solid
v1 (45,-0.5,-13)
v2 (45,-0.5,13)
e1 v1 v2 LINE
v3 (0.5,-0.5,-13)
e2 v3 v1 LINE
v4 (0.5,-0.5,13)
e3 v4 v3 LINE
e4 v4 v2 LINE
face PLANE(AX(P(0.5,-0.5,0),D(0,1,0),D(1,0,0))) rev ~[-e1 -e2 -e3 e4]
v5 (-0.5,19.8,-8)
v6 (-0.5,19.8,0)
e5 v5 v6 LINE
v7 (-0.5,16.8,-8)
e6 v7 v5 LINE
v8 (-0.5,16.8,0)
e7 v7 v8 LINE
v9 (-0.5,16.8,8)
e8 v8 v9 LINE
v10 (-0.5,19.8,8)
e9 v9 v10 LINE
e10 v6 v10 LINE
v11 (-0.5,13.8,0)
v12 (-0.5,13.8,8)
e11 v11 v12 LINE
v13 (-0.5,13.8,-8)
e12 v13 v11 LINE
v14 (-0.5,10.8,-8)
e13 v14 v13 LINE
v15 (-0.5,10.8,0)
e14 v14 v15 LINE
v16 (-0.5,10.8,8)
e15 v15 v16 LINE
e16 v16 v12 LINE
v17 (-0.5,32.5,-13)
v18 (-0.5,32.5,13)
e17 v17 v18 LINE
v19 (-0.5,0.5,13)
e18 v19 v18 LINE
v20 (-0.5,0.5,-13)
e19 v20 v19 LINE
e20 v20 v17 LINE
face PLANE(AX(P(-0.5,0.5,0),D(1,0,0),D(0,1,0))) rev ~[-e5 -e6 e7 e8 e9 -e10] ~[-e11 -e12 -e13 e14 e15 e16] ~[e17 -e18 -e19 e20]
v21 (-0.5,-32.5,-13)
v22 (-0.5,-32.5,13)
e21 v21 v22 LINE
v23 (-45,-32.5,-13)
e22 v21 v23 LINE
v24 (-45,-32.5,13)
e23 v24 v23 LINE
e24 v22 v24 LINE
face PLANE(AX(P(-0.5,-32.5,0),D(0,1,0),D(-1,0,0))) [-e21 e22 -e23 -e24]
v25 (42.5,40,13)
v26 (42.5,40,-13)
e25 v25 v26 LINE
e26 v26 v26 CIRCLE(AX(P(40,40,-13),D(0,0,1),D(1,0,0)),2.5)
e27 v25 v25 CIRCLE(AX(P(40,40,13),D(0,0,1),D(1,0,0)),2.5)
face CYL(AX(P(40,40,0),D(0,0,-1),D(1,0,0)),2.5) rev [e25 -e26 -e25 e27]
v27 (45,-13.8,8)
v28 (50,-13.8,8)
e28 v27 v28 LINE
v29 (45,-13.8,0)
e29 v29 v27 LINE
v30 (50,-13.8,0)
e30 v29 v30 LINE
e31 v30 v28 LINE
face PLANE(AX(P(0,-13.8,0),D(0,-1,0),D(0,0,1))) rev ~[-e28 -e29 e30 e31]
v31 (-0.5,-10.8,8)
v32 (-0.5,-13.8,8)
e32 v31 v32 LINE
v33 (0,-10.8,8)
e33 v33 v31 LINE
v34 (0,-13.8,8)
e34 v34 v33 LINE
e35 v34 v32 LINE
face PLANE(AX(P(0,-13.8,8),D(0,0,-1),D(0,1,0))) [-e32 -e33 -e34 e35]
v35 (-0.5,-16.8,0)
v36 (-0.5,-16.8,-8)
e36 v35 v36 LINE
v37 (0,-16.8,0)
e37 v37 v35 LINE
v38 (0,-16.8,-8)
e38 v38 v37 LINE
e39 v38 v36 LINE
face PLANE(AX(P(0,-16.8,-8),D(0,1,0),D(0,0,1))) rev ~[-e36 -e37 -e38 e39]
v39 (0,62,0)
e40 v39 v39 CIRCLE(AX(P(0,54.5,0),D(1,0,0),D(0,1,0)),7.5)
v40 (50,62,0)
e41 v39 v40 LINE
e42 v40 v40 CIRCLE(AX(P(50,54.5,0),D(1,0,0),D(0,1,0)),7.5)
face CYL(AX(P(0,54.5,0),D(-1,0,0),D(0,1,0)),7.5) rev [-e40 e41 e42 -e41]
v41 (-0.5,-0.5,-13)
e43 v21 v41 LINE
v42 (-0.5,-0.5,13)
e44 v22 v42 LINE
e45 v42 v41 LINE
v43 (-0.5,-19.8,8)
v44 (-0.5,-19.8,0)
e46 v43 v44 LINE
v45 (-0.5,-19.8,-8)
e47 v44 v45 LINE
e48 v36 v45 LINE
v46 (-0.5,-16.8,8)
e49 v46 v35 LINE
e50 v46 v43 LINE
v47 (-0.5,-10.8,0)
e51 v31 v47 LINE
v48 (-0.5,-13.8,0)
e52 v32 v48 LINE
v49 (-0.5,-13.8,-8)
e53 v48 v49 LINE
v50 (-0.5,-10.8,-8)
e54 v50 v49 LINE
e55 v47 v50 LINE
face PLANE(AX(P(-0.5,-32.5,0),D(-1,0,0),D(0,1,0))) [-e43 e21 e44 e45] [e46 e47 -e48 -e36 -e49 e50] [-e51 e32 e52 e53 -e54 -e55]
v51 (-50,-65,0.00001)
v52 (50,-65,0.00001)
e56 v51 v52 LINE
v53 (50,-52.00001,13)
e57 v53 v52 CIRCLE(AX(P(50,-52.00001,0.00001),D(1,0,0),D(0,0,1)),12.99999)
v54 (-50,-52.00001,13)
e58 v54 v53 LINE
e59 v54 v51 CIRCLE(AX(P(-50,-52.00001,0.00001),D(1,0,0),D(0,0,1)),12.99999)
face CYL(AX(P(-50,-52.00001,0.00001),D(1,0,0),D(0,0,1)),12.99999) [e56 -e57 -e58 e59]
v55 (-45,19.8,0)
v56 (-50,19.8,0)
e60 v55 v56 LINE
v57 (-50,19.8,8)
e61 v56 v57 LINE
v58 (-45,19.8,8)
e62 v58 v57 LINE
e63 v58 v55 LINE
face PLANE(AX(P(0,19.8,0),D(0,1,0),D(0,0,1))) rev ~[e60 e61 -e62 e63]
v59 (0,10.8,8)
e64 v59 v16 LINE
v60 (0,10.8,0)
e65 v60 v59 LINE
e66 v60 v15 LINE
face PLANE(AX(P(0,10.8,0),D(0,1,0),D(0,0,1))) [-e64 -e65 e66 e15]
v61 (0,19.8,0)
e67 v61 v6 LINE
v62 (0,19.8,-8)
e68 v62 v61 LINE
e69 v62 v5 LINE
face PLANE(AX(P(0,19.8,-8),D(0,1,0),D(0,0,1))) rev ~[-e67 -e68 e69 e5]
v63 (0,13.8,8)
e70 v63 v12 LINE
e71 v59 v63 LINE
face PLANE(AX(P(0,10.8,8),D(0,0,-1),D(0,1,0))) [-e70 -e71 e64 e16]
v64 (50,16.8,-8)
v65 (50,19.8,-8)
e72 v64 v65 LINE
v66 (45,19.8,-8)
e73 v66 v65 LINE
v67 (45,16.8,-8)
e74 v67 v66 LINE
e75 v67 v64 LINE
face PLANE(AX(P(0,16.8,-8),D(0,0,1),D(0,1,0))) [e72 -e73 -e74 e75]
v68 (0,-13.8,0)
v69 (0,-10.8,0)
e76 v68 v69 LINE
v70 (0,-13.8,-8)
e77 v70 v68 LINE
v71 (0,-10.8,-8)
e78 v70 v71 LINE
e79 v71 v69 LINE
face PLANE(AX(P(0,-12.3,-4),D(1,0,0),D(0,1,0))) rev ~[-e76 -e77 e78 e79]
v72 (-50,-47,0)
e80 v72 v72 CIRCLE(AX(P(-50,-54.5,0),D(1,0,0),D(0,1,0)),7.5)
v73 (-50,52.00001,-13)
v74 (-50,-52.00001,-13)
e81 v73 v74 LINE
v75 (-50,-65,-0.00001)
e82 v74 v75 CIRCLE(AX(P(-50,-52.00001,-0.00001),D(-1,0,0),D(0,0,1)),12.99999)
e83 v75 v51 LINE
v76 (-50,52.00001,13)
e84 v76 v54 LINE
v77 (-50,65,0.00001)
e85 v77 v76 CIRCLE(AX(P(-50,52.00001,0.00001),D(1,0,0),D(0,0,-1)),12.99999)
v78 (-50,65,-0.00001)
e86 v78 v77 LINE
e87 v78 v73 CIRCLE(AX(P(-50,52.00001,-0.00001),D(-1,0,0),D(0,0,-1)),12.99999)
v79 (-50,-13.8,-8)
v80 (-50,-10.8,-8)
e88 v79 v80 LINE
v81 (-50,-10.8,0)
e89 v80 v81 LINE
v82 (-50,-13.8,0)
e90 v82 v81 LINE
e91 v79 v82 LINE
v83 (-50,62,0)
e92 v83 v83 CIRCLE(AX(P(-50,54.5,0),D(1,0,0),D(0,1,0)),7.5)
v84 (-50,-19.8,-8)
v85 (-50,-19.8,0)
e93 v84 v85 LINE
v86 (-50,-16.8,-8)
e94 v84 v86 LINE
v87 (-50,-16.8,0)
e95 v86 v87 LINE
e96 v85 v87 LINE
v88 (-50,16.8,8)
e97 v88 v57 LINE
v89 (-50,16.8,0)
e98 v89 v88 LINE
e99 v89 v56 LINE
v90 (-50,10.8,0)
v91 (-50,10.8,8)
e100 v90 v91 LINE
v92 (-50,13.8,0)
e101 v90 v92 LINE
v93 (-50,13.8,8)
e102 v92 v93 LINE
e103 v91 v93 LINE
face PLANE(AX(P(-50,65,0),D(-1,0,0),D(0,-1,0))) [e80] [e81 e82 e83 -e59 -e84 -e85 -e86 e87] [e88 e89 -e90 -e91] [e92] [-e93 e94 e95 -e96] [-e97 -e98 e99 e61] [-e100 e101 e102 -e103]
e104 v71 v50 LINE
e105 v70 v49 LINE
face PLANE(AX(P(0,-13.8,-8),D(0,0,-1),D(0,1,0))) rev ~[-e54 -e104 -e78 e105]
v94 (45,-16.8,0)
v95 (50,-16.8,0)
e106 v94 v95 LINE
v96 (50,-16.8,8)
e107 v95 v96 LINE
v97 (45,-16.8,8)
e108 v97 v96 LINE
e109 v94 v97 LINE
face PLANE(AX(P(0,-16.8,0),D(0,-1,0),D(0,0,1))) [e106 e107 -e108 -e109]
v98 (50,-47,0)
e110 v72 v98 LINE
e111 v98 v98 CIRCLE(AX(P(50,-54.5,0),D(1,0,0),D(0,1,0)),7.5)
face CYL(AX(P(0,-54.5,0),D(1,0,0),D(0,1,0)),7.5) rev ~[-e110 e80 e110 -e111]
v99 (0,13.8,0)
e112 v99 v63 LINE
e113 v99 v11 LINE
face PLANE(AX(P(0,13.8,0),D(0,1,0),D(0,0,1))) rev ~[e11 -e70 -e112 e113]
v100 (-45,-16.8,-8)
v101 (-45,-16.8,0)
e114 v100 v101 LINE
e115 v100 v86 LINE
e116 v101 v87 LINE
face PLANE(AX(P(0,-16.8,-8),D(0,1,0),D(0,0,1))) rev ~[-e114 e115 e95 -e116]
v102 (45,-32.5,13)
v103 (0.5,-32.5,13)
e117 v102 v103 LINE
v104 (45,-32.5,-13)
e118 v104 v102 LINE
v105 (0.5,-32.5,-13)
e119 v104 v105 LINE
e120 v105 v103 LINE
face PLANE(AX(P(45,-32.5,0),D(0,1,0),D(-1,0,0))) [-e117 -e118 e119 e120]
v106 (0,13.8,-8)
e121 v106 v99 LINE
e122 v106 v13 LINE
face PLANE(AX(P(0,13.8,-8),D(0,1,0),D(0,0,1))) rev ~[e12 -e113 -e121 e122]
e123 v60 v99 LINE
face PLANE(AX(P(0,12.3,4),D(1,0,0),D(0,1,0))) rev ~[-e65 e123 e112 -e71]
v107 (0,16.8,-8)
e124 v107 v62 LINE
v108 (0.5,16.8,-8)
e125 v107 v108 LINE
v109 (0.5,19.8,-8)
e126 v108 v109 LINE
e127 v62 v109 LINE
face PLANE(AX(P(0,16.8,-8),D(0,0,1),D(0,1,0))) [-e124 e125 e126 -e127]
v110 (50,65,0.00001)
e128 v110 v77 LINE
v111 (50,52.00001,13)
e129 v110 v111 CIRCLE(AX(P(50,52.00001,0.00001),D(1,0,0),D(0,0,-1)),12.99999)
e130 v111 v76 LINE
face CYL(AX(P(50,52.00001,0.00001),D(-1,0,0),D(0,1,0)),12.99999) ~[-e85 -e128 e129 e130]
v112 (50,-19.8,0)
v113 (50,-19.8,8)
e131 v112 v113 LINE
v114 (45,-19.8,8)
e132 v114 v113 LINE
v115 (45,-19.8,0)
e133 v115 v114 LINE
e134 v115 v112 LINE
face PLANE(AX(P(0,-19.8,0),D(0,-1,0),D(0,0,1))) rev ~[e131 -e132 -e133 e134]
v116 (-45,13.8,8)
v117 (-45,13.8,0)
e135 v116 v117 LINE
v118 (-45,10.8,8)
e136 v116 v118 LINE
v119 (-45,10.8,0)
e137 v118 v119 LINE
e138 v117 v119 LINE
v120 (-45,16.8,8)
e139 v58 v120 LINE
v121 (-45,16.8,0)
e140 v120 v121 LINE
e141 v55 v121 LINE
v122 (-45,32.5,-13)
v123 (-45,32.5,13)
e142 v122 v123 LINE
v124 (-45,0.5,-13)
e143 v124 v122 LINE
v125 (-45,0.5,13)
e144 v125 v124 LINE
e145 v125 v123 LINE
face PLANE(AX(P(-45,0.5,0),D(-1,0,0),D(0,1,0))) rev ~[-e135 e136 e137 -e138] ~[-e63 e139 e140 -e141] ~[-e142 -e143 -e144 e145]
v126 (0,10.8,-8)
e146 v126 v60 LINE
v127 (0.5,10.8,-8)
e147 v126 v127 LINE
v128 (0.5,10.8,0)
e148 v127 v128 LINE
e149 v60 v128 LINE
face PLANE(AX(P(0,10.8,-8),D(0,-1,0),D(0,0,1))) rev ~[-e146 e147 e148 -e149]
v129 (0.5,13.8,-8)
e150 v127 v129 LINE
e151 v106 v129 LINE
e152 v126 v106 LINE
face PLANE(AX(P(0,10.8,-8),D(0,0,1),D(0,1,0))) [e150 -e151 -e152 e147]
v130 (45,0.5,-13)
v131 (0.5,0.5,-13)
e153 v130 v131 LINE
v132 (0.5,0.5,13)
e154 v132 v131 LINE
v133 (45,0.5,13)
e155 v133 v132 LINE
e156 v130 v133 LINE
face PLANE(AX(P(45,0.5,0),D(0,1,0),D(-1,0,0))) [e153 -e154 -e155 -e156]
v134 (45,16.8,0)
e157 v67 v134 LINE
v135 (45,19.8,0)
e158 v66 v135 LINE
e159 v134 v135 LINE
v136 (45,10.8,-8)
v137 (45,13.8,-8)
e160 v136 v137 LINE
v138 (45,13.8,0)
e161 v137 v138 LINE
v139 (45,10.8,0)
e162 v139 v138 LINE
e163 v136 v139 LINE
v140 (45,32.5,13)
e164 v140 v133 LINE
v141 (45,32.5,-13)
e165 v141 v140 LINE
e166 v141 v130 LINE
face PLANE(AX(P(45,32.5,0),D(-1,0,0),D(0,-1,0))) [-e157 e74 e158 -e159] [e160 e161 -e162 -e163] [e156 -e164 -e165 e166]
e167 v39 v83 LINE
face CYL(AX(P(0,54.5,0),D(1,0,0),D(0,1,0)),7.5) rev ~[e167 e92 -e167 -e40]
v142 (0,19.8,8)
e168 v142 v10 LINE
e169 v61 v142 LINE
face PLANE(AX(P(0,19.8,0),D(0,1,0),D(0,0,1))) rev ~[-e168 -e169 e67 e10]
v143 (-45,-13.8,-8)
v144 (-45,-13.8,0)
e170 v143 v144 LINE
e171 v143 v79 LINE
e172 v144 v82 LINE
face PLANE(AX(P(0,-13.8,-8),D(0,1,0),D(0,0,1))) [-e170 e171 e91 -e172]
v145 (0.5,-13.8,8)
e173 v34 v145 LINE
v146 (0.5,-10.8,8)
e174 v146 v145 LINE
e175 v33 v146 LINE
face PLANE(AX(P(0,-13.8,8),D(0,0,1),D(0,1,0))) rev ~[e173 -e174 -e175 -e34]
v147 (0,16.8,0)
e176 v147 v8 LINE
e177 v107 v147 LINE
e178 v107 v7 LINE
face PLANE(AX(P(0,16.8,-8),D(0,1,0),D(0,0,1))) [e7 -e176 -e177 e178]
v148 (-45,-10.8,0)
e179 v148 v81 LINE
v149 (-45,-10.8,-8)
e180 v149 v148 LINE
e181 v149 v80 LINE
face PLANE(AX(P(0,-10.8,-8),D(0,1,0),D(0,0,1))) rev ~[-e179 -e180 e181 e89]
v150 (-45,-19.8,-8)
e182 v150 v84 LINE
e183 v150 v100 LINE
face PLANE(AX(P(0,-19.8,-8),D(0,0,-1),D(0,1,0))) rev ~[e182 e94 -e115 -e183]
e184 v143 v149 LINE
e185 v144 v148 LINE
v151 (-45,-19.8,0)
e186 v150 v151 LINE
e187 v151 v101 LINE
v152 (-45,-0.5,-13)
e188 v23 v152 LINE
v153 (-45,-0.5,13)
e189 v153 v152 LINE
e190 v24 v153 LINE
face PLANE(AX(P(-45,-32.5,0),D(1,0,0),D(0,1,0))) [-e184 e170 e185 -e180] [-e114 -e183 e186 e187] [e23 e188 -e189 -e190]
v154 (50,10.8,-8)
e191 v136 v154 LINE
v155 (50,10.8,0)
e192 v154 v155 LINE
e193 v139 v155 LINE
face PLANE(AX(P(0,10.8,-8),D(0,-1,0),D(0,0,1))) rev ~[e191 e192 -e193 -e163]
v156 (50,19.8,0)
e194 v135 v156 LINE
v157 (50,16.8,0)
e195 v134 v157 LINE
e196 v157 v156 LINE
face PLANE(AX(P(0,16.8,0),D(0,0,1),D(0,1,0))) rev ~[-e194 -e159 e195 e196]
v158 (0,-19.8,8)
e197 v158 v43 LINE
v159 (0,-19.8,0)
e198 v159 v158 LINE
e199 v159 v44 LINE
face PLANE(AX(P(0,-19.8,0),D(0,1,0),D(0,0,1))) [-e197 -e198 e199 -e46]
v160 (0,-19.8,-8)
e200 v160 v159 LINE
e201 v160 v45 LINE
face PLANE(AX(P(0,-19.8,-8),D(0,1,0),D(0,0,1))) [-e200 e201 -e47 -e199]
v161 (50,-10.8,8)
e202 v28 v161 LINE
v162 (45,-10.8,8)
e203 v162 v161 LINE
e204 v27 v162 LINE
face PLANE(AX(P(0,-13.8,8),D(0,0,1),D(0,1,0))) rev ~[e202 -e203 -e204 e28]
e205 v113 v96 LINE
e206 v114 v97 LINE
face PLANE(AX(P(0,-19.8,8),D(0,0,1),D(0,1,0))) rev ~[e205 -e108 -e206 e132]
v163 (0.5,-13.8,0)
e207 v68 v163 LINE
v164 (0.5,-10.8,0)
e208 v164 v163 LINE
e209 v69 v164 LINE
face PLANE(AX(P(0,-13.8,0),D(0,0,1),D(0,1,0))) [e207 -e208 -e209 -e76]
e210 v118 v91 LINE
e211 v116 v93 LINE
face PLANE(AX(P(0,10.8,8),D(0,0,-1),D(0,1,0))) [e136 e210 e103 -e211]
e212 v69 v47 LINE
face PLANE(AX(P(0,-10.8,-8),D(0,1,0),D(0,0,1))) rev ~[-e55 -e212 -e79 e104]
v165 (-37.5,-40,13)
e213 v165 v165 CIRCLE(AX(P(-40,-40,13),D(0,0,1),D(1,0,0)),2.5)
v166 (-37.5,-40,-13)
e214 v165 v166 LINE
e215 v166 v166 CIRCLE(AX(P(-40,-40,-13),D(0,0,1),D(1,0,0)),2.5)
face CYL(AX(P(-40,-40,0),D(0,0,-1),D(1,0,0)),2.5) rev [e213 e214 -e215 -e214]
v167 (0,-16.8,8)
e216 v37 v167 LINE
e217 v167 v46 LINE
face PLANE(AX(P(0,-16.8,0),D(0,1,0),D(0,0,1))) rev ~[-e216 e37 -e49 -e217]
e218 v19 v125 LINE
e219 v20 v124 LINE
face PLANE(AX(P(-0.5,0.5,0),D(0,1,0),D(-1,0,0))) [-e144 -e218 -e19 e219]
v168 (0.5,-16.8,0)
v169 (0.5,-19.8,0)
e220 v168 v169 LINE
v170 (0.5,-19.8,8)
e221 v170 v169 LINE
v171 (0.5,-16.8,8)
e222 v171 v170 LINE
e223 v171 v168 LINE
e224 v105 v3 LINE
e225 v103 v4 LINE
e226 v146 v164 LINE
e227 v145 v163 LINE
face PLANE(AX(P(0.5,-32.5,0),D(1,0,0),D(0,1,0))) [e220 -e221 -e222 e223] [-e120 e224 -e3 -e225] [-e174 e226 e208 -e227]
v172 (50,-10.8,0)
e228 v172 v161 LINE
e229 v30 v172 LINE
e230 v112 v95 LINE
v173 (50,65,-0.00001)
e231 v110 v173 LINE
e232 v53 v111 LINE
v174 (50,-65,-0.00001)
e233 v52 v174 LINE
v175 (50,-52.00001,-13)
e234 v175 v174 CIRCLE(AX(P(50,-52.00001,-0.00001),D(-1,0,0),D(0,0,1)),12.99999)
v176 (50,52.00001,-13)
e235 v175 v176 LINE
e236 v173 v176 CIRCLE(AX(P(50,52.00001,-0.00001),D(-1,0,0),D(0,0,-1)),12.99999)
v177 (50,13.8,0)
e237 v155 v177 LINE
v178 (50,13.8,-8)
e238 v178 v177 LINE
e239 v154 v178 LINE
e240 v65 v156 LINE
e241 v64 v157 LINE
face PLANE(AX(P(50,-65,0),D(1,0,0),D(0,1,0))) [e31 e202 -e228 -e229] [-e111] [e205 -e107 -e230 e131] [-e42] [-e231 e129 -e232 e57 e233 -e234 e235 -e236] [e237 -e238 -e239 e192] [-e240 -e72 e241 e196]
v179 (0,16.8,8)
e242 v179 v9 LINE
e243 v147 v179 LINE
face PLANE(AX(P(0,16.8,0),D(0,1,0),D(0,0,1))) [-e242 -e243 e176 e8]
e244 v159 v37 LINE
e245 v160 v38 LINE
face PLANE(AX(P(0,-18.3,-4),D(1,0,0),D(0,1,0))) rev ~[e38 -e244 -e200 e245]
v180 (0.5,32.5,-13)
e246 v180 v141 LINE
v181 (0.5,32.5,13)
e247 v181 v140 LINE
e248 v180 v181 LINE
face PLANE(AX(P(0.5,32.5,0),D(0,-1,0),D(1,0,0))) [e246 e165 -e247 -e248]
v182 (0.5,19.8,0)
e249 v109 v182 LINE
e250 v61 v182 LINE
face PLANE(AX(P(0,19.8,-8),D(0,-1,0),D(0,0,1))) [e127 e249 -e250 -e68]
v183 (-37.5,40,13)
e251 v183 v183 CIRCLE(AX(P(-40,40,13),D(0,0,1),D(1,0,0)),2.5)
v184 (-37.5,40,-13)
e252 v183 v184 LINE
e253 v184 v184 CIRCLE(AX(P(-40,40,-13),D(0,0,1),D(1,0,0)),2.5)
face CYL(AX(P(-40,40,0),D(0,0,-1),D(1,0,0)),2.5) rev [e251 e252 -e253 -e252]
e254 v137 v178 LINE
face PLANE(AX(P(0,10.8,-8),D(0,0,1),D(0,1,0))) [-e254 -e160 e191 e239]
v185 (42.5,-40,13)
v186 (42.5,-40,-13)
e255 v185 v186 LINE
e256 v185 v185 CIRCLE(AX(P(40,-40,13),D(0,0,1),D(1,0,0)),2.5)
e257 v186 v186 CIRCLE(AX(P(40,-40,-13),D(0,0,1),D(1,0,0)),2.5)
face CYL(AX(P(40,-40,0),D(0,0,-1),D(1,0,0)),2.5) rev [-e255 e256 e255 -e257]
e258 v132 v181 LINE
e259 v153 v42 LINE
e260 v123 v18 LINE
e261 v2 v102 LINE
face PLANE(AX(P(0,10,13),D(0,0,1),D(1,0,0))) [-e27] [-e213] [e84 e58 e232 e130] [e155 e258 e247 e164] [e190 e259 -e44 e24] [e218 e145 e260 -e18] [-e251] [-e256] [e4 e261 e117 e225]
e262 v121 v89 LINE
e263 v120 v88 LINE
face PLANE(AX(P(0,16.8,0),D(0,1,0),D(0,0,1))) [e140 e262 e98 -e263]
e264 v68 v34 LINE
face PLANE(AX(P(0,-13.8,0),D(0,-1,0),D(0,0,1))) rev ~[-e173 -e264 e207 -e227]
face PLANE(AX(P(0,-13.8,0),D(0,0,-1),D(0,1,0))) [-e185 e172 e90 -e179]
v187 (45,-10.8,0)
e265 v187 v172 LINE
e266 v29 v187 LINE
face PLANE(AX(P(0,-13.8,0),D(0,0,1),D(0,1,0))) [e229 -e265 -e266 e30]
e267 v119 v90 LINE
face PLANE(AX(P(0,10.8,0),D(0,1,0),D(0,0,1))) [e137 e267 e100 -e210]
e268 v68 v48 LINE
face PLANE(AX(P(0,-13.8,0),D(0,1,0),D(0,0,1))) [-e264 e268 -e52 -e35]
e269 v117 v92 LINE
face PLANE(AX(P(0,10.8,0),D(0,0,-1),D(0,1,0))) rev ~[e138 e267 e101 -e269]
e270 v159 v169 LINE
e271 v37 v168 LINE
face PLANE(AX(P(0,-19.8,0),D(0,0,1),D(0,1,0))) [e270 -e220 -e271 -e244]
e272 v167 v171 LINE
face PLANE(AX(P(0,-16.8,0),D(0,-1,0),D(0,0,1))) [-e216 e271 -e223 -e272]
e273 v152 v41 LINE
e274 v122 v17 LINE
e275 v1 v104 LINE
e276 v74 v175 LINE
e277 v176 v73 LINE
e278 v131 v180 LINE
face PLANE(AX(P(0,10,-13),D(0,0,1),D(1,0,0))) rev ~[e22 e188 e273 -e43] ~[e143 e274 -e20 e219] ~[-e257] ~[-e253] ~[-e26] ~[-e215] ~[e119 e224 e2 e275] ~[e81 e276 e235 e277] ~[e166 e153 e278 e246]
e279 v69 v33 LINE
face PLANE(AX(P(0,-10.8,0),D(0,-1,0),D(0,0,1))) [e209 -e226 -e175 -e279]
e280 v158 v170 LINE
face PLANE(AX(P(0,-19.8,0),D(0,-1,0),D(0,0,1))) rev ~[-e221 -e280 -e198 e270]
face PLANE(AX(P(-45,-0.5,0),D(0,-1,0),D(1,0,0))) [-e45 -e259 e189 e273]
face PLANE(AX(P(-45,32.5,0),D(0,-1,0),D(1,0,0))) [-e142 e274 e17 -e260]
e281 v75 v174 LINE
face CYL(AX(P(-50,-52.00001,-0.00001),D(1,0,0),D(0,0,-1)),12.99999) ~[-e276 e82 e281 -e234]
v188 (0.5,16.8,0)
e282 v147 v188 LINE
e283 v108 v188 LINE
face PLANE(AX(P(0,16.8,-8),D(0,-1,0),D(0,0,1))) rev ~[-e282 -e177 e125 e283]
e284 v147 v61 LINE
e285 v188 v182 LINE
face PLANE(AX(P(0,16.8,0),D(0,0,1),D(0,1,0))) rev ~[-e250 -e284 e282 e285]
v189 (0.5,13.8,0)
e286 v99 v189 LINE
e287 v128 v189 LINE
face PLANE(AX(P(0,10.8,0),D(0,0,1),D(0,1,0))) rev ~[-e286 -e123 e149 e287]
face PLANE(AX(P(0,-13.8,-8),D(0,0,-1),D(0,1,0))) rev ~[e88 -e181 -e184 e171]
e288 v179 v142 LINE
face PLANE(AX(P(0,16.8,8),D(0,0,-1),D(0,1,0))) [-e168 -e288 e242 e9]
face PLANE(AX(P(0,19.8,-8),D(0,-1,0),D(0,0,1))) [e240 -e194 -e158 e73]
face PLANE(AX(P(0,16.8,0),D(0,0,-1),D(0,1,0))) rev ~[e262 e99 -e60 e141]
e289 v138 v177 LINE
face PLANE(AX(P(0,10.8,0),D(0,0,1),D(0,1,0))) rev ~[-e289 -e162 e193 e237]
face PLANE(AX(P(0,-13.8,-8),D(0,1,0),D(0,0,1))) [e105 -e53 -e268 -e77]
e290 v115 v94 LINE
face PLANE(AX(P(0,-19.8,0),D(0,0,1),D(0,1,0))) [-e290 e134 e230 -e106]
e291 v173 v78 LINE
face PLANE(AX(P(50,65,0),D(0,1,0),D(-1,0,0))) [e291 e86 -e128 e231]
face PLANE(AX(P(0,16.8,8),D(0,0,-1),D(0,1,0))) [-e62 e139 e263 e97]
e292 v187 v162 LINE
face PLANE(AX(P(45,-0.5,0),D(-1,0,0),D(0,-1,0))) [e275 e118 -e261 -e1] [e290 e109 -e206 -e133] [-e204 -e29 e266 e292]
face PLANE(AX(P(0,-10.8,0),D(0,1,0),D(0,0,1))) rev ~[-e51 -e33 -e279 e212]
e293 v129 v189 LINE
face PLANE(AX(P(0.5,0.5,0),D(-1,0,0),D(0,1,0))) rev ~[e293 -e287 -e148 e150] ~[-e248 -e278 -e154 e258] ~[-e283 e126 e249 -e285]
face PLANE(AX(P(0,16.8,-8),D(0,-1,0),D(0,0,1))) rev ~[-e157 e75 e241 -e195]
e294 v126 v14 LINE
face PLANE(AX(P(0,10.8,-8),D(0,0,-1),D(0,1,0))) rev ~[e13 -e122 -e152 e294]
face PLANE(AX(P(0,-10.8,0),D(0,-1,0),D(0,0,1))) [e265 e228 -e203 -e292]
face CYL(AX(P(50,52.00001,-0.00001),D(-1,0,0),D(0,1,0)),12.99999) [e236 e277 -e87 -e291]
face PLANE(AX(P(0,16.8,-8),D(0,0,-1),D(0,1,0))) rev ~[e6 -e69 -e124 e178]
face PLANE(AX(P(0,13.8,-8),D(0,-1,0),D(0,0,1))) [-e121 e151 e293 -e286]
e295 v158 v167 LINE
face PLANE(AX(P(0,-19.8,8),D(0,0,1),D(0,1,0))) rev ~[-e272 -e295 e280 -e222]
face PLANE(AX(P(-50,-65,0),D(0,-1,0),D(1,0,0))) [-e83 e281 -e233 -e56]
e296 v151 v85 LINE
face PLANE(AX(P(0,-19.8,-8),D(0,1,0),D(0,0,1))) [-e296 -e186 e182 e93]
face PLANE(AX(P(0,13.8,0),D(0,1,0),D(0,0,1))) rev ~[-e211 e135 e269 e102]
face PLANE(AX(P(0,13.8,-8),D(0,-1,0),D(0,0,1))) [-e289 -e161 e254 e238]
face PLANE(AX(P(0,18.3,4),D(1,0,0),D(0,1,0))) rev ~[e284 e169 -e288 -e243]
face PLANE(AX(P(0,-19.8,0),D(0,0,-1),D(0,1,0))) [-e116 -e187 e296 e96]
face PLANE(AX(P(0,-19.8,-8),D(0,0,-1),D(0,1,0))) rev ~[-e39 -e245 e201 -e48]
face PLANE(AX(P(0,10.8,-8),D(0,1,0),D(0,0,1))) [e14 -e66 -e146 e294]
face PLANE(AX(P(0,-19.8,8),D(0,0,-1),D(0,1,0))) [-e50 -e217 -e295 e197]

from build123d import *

# Parameters (mm, degrees)
F0_R          = 2.5
F0_W          = 44.5
F0_H          = 1
F0_W_2        = 1
F0_H_2        = 32
F1_DEPTH      = 13
F2_R          = 7.5
F3_DEPTH      = 50
F4_R          = 12.99999
F2_W          = 3
F2_H          = 8
F5_DEPTH      = 50
F6_DEPTH      = 50
F6_DEPTH_BACK = 25


# Not quite as in the source:
# - a fillet or chamfer is up to 0.001 mm smaller than in the source, because OpenCascade refuses the exact size
# - a feature names something its author has since deleted; it is built from what else it names


with BuildPart() as f1:
    # F0 (on Top) → F1 (new body, symmetric)
    with BuildSketch(Plane.XY):
        Polygon((50, 45), (50, 65), (-40, 65), (-50, 65), (-50, -45), (-40, -45), (50, -45), (50, -34.6913893335), (50, 40), align=None)
        with Locations((-40, -40)):
            Circle(F0_R, mode=Mode.SUBTRACT)
        with Locations((40, -40)):
            Circle(F0_R, mode=Mode.SUBTRACT)
        with Locations((-40, 40)):
            Circle(F0_R, mode=Mode.SUBTRACT)
        Polygon((0.5, 32.5), (45, 32.5), (45, 0.5), (45, -0.5), (45, -32.5), (0.5, -32.5), (-0.5, -32.5), (-45, -32.5), (-45, -0.5), (-45, 0.5), (-45, 32.5), (-0.5, 32.5), align=None, mode=Mode.SUBTRACT)
        with Locations((40, 40)):
            Circle(F0_R, mode=Mode.SUBTRACT)
        Polygon((-40, -45), (-50, -45), (-50, -65), (50, -65), (50, -45), align=None)
        with Locations((22.75, 0)):
            Rectangle(F0_W, F0_H)
        with Locations((-22.75, 0)):
            Rectangle(F0_W, F0_H)
        Rectangle(F0_W_2, F0_H)
        with Locations((0, -16.5)):
            Rectangle(F0_W_2, F0_H_2)
        with Locations((0, 16.5)):
            Rectangle(F0_W_2, F0_H_2)
    extrude(amount=F1_DEPTH, both=True)

    # F2 (on Right) → F3 (cut, symmetric)
    with BuildSketch(Plane.YZ):
        with Locations((54.5, 0)):
            Circle(F2_R)
        with Locations((-54.5, 0)):
            Circle(F2_R)
    extrude(amount=F3_DEPTH, both=True, mode=Mode.SUBTRACT)

    # F4 (radius 13 in the source; OpenCascade refuses exactly that, so slightly less here)
    f4_edges = [f1.edges().sort_by_distance(p)[0] for p in [
        (0, 65, 13),
        (0, 65, -13),
        (0, -65, 13),
        (0, -65, -13),
    ]]
    fillet(f4_edges, radius=F4_R)

    # F2 (on Right) → F5 (cut)
    with BuildSketch(Plane.YZ):
        with Locations((-18.3, -4)):
            Rectangle(F2_W, F2_H)
        with Locations((-12.3, -4)):
            Rectangle(F2_W, F2_H)
        with Locations((12.3, 4)):
            Rectangle(F2_W, F2_H)
        with Locations((18.3, 4)):
            Rectangle(F2_W, F2_H)
    extrude(amount=-F5_DEPTH, mode=Mode.SUBTRACT)

    # F2 (on Right) → F6 (cut, two sides)
    with BuildSketch(Plane.YZ) as f6_sk:
        with Locations((12.3, -4)):
            Rectangle(F2_W, F2_H)
        with Locations((18.3, -4)):
            Rectangle(F2_W, F2_H)
        with Locations((-12.3, 4)):
            Rectangle(F2_W, F2_H)
        with Locations((-18.3, 4)):
            Rectangle(F2_W, F2_H)
    extrude(amount=F6_DEPTH, mode=Mode.SUBTRACT)
    extrude(f6_sk.sketch, amount=-F6_DEPTH_BACK, mode=Mode.SUBTRACT)


solid = f1.part
